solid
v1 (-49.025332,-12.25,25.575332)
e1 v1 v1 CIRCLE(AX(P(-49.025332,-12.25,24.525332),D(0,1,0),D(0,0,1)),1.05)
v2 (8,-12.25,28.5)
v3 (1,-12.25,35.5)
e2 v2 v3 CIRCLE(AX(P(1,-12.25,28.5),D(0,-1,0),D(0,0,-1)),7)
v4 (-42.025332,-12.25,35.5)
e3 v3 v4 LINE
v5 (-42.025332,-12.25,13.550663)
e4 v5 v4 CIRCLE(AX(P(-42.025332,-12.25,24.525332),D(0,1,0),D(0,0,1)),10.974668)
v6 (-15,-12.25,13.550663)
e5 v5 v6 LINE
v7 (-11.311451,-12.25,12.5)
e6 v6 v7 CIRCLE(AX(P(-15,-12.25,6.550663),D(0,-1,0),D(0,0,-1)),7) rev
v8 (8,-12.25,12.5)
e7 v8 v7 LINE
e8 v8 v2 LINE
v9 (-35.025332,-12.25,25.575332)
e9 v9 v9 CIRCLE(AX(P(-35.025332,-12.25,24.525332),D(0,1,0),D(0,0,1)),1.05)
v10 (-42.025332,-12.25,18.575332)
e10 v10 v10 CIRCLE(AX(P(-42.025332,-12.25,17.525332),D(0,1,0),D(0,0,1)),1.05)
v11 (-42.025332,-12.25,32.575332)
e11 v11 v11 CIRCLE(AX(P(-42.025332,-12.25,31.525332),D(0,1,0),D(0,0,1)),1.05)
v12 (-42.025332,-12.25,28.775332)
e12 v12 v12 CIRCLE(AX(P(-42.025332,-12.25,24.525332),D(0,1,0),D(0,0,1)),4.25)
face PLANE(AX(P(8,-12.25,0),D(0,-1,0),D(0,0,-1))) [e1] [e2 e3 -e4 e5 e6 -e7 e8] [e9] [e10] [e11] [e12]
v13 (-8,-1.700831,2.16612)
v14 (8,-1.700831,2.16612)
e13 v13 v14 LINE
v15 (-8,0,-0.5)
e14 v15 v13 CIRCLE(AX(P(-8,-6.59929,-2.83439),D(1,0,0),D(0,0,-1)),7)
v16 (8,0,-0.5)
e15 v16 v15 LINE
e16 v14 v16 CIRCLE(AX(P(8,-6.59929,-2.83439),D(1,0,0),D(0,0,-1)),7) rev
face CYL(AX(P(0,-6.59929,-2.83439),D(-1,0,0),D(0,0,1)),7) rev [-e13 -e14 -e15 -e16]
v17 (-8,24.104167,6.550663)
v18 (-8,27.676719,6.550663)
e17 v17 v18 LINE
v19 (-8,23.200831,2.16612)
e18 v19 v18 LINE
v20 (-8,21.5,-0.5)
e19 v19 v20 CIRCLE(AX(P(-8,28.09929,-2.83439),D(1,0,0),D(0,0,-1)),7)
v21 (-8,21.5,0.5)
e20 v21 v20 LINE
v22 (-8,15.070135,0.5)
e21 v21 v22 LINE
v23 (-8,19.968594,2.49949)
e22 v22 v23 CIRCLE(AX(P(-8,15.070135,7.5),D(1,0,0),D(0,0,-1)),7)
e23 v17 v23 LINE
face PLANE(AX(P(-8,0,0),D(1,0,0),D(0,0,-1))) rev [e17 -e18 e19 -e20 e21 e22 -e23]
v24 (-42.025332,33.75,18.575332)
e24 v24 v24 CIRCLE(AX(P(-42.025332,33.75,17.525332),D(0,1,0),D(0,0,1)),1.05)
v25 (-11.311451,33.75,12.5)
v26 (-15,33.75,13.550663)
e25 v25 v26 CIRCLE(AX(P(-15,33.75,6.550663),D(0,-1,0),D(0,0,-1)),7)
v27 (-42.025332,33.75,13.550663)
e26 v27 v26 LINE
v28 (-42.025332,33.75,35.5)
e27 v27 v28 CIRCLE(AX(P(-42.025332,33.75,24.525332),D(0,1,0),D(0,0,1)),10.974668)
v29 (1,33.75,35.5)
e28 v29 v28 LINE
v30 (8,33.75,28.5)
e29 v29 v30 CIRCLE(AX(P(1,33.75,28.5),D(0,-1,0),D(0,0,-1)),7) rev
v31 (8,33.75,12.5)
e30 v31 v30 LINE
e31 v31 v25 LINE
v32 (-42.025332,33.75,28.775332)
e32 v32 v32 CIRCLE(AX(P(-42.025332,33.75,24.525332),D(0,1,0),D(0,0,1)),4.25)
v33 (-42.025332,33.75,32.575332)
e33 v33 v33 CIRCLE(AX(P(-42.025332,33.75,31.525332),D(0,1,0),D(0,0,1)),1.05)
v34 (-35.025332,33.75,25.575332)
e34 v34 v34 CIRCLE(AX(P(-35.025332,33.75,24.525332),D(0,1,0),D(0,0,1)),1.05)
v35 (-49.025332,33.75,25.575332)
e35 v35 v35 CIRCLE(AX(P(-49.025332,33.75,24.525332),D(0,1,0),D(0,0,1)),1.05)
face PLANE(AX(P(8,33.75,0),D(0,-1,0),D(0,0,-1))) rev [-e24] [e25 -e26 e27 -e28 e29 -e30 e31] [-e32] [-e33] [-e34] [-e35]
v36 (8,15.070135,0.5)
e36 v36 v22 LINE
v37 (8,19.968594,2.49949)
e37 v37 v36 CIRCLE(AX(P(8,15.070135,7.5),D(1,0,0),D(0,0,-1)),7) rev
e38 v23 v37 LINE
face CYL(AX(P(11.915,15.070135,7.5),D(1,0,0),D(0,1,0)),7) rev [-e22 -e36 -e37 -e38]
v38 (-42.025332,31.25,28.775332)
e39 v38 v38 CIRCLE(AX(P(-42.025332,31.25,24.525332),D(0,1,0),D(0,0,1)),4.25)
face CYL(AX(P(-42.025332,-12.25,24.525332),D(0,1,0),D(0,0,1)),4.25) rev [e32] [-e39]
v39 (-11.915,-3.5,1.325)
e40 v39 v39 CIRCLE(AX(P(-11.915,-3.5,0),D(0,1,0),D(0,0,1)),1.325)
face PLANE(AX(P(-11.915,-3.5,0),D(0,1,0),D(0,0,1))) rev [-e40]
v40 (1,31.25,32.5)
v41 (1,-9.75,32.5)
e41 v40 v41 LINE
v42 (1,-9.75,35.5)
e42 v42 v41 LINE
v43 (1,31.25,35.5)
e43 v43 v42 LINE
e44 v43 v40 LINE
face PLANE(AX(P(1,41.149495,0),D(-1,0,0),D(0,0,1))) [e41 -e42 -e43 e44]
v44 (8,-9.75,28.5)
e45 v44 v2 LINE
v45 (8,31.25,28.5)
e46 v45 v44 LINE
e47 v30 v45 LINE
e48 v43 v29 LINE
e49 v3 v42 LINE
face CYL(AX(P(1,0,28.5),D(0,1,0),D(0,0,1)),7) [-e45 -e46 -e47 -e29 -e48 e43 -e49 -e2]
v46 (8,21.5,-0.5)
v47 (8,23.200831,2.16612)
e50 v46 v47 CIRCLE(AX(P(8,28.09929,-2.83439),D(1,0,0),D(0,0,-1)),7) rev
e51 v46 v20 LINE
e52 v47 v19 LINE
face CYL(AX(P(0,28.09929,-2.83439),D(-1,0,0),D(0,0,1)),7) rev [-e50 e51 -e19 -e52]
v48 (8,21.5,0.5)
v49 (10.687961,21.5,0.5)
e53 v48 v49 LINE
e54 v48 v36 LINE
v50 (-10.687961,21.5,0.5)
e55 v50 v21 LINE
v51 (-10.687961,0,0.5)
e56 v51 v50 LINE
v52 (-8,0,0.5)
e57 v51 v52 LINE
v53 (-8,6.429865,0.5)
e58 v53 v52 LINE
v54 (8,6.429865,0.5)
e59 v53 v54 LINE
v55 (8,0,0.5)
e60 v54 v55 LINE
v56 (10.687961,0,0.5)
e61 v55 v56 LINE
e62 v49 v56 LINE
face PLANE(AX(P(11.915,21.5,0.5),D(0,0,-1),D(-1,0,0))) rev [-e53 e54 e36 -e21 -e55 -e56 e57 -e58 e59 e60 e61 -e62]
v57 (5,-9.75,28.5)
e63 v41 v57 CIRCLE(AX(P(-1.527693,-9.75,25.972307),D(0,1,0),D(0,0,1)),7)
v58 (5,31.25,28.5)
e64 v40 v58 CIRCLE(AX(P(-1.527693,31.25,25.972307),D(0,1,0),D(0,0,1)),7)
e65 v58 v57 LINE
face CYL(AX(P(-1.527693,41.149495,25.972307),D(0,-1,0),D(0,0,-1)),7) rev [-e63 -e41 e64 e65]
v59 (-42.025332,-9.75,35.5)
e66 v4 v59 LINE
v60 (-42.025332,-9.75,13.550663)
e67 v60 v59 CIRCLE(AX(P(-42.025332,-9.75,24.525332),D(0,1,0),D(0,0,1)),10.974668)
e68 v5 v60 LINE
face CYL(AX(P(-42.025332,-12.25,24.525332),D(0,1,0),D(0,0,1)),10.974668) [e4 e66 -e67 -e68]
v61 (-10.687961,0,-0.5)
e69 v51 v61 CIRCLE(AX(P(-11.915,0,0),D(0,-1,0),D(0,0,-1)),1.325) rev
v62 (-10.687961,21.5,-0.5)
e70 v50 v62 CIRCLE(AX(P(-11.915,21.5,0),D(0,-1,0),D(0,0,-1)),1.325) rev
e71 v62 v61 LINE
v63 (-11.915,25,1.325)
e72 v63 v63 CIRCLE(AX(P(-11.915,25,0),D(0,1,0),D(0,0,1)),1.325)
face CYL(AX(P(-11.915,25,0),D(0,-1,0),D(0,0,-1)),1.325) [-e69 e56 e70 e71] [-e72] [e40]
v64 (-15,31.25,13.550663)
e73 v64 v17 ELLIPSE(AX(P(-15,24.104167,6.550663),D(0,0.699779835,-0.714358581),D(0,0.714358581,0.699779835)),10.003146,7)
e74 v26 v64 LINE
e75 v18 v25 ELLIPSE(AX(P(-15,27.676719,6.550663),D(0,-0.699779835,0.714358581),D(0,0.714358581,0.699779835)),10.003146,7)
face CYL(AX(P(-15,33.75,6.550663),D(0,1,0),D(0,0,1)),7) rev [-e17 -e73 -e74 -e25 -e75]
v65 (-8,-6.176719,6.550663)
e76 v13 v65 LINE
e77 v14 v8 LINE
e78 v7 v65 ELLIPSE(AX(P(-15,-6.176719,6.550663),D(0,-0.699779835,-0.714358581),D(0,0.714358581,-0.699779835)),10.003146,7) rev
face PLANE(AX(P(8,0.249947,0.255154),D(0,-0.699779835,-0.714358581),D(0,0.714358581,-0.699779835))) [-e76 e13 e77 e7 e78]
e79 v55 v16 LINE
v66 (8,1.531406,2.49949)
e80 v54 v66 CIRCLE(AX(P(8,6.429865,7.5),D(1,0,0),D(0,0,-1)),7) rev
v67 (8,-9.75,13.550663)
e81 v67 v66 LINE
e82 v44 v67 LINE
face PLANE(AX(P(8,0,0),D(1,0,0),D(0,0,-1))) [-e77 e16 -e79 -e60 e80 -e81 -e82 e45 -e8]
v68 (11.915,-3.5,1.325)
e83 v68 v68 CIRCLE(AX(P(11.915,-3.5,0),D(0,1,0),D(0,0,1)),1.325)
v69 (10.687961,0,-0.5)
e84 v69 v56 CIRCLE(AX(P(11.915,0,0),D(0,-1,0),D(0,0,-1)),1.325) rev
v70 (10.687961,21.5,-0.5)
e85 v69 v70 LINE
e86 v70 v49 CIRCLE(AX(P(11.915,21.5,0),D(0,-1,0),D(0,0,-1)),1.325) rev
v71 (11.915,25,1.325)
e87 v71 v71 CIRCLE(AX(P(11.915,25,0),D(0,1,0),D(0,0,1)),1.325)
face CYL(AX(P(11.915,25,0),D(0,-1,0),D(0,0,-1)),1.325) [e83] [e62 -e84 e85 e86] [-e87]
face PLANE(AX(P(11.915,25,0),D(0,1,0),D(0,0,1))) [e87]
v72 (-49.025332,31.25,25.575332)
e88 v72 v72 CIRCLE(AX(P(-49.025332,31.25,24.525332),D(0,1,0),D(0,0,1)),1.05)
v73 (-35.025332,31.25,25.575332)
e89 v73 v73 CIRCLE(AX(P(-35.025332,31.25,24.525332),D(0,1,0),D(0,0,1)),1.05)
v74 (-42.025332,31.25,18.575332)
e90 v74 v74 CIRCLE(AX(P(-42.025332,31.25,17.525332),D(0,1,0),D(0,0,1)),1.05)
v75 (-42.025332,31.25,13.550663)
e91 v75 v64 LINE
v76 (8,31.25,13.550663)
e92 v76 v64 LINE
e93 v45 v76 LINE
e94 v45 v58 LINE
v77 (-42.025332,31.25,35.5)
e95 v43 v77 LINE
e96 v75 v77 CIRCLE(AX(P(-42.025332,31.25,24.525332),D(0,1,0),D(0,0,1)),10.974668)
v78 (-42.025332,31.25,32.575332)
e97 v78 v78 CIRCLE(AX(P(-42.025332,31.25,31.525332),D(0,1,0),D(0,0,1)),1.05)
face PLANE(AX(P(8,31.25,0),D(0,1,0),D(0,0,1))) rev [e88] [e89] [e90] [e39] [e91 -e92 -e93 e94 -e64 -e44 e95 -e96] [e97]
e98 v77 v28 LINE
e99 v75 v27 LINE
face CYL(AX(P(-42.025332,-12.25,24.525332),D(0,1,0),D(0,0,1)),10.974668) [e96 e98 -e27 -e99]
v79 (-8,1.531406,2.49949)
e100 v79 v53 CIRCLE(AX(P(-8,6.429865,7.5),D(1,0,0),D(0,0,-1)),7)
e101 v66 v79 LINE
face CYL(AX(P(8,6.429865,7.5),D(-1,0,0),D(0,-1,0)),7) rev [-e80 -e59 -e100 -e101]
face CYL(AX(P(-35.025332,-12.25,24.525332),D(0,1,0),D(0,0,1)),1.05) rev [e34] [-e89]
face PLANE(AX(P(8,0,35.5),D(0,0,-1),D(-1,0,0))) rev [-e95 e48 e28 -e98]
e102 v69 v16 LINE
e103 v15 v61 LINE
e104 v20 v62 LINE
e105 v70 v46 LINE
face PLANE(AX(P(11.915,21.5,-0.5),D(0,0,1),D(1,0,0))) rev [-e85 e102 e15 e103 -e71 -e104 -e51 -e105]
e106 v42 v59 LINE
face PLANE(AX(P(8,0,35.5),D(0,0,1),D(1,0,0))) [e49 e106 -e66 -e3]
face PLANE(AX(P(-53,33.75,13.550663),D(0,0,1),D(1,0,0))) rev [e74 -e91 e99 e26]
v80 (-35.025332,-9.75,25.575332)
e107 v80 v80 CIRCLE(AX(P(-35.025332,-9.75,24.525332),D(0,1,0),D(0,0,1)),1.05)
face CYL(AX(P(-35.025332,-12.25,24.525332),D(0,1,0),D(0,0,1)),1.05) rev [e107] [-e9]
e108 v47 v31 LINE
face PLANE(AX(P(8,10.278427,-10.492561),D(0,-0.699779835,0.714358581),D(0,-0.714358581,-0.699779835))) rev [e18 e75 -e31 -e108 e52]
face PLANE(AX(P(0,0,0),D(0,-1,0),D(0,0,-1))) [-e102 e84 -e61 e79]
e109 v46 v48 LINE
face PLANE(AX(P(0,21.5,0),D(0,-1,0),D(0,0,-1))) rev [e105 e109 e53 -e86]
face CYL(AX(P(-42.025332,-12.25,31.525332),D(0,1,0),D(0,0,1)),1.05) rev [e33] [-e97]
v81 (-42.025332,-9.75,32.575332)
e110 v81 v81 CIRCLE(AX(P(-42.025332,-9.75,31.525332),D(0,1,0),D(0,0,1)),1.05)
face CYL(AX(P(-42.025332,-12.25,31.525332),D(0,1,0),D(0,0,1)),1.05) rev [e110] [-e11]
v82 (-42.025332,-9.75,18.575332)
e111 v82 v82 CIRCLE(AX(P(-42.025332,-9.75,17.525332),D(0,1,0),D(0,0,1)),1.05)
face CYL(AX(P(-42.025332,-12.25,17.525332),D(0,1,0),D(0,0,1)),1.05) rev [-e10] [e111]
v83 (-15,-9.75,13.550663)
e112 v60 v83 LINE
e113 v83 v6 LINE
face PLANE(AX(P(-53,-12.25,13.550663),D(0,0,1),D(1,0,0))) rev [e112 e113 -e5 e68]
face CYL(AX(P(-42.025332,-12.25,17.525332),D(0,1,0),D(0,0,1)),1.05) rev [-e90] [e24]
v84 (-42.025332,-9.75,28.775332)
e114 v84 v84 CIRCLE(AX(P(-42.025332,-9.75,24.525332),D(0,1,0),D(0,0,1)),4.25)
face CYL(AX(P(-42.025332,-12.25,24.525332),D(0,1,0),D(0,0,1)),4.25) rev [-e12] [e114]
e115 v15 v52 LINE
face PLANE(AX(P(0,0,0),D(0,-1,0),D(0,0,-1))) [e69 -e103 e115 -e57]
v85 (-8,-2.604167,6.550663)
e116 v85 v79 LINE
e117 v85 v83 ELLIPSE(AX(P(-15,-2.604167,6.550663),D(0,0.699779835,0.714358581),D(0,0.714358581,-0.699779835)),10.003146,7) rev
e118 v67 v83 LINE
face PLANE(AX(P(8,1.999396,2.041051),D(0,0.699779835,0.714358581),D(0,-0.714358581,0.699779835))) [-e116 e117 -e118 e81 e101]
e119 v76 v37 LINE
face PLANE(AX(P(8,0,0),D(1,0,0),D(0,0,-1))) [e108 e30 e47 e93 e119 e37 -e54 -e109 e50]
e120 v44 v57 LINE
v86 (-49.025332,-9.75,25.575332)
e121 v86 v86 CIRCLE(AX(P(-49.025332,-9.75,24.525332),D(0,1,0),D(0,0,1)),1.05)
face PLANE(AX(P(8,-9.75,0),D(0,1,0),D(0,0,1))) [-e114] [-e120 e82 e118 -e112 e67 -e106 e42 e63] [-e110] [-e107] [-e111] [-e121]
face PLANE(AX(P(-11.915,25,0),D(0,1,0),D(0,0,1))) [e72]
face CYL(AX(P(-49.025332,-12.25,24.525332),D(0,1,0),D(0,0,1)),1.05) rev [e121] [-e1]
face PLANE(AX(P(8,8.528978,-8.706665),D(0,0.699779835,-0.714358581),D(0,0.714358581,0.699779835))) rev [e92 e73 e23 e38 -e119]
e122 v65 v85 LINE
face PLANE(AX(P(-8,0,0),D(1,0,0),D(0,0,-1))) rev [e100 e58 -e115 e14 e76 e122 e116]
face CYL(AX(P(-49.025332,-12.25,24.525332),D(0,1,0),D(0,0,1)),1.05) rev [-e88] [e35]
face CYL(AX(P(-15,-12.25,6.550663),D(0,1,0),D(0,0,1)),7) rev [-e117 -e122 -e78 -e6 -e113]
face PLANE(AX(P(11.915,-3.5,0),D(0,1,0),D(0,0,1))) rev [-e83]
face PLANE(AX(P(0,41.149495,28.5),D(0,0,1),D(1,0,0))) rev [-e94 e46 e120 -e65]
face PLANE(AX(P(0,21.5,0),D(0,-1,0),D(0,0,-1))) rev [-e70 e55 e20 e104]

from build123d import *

# Parameters (mm, degrees)
SKETCH1_W           = 23.83
SKETCH1_H           = 1
BOSS_EXTRUDE1_DEPTH = 21.5
SKETCH2_R           = 1.325
BOSS_EXTRUDE2_DEPTH = 14.25
BOSS_EXTRUDE4_DEPTH = 8
SKETCH5_W           = 21.949336604
SKETCH5_H           = 2.5
BOSS_EXTRUDE5_DEPTH = 45
SKETCH6_R           = 4.25
SKETCH6_R_2         = 1.05
CUT_EXTRUDE1_DEPTH  = 79.646360374
FILLET1_R           = 7
FILLET2_R           = 7
FILLET3_R           = 7
BOSS_EXTRUDE6_START = 41
BOSS_EXTRUDE6_DEPTH = 41


with BuildPart() as part:
    # Sketch1 → Boss-Extrude1 (new body)
    with BuildSketch(Plane(origin=(0, 0, 0), x_dir=(1, 0, 0), z_dir=(0, 1, 0))):
        Rectangle(SKETCH1_W, SKETCH1_H)
    extrude(amount=BOSS_EXTRUDE1_DEPTH)

    # Sketch2 → Boss-Extrude2 (add, symmetric)
    with BuildSketch(Plane(origin=(0, 10.75, 0), x_dir=(1, 0, 0), z_dir=(0, 1, 0))):
        with Locations(Location((-11.915, 0, 0), (0, 0, 270))):
            Circle(SKETCH2_R)
        with Locations(Location((11.915, 0, 0), (0, 0, 270))):
            Circle(SKETCH2_R)
    extrude(amount=BOSS_EXTRUDE2_DEPTH, both=True)

    # Sketch4 → Boss-Extrude4 (add, symmetric)
    with BuildSketch(Plane(origin=(0, 0, 0), x_dir=(0, 0, -1), z_dir=(1, 0, 0))):
        Polygon((-0.5, 17.927447783), (-0.5, 21.5), (-12.5, 33.75), (-35.5, 33.75), (-35.5, 31.25), (-13.550663396, 31.25), align=None)
        Polygon((-0.5, 0), (-0.5, 3.572552217), (-13.550663396, -9.75), (-35.5, -9.75), (-35.5, -12.25), (-12.5, -12.25), align=None)
    extrude(amount=BOSS_EXTRUDE4_DEPTH, both=True)

    # Sketch5 → Boss-Extrude5 (add)
    with BuildSketch(Plane.ZY.offset(8)):
        with Locations((24.525331698, 32.5)):
            Rectangle(SKETCH5_W, SKETCH5_H)
        with Locations((24.525331698, -11)):
            Rectangle(SKETCH5_W, SKETCH5_H)
    extrude(amount=BOSS_EXTRUDE5_DEPTH)

    # Sketch6 → Cut-Extrude1 (cut, through all)
    with BuildSketch(Plane(origin=(0, 33.75, 0), x_dir=(1, 0, 0), z_dir=(0, 1, 0))):
        with Locations(Location((-42.025331698, -24.525331698, 0), (0, 0, 270))):
            Circle(SKETCH6_R)
        with Locations(Location((-49.025331698, -24.525331698, 0), (0, 0, 270))):
            Circle(SKETCH6_R_2)
        with Locations(Location((-42.025331698, -17.525331698, 0), (0, 0, 270))):
            Circle(SKETCH6_R_2)
        with Locations(Location((-35.025331698, -24.525331698, 0), (0, 0, 270))):
            Circle(SKETCH6_R_2)
        with Locations(Location((-42.025331698, -31.525331698, 0), (0, 0, 270))):
            Circle(SKETCH6_R_2)
        with BuildLine():
            ThreePointArc((-53, -24.525331698), (-49.785594076, -16.76506932), (-42.025331698, -13.550663396))
            Line((-42.025331698, -13.550663396), (-53, -13.550663396))
            Line((-53, -13.550663396), (-53, -24.525331698))
        make_face()
        with BuildLine():
            ThreePointArc((-42.025331698, -35.5), (-49.785594076, -32.285594076), (-53, -24.525331698))
            Line((-53, -24.525331698), (-53, -35.5))
            Line((-53, -35.5), (-42.025331698, -35.5))
        make_face()
    extrude(amount=-CUT_EXTRUDE1_DEPTH, mode=Mode.SUBTRACT)

    # Fillet1
    # the kernel refuses this fillet: 7 mm, written as the material it adds along each edge
    with BuildSketch(Plane(origin=(-8, -12.25, 13.550663396), x_dir=(-1, 0, 0), z_dir=(0, 1, 0))) as fillet1_piece_1_section:
        with BuildLine():
            CenterArc((FILLET1_R, -FILLET1_R), FILLET1_R, 90, 90)
            Line((0, -FILLET1_R), (0, 0))
            Line((0, 0), (FILLET1_R, 0))
        make_face()
    fillet1_piece_1 = extrude(amount=2.5, mode=Mode.PRIVATE)
    fillet1_piece_1 = split(fillet1_piece_1, bisect_by=Plane(origin=(-10.015975833, -11.661011889, 11.923032054), z_dir=(0, 0.699779834816443, 0.7143585813751185)), keep=Keep.TOP, mode=Mode.PRIVATE)
    fillet1_piece_1 = split(fillet1_piece_1, bisect_by=Plane(origin=(-10.015975833, -9.911562302, 13.708928508), z_dir=(0, -0.6997798348164429, -0.7143585813751187)), keep=Keep.TOP, mode=Mode.PRIVATE)
    add(fillet1_piece_1)
    with BuildSketch(Plane(origin=(-8, -12.25, 13.550663396), x_dir=(-1, 0, 0), z_dir=(0, 1, 0))) as fillet1_piece_2_section:
        with BuildLine():
            CenterArc((FILLET1_R, -FILLET1_R), FILLET1_R, 90, 90)
            Line((0, -FILLET1_R), (0, 0))
            Line((0, 0), (FILLET1_R, 0))
        make_face()
    fillet1_piece_2 = extrude(amount=20, mode=Mode.PRIVATE)
    fillet1_piece_2 = split(fillet1_piece_2, bisect_by=Plane(origin=(-8.812454151, -9.294822672, 9.605132414), z_dir=(0, 0.699779834816443, 0.7143585813751185)), keep=Keep.TOP, mode=Mode.PRIVATE)
    fillet1_piece_2 = split(fillet1_piece_2, bisect_by=Plane(origin=(-8.812454151, -9.75, 10.768831879), z_dir=(0, 1, 0)), keep=Keep.TOP, mode=Mode.PRIVATE)
    fillet1_piece_2 = split(fillet1_piece_2, bisect_by=Plane(origin=(-8.812454151, -7.545373085, 11.391028867), z_dir=(0, -0.6997798348164429, -0.7143585813751187)), keep=Keep.TOP, mode=Mode.PRIVATE)
    add(fillet1_piece_2)
    with BuildSketch(Plane(origin=(-8, 33.75, 13.550663396), x_dir=(0, 0, -1), z_dir=(0, -1, 0))) as fillet1_piece_3_section:
        with BuildLine():
            CenterArc((FILLET1_R, -FILLET1_R), FILLET1_R, 90, 90)
            Line((0, -FILLET1_R), (0, 0))
            Line((0, 0), (FILLET1_R, 0))
        make_face()
    fillet1_piece_3 = extrude(amount=2.5, mode=Mode.PRIVATE)
    fillet1_piece_3 = split(fillet1_piece_3, bisect_by=Plane(origin=(-10.015975833, 31.411562301, 13.708928507), z_dir=(0, 0.6997798348164431, -0.7143585813751184)), keep=Keep.TOP, mode=Mode.PRIVATE)
    fillet1_piece_3 = split(fillet1_piece_3, bisect_by=Plane(origin=(-10.015975833, 33.161011889, 11.923032054), z_dir=(0, -0.699779834816443, 0.7143585813751185)), keep=Keep.TOP, mode=Mode.PRIVATE)
    add(fillet1_piece_3)
    with BuildSketch(Plane(origin=(-8, 33.75, 13.550663396), x_dir=(0, 0, -1), z_dir=(0, -1, 0))) as fillet1_piece_4_section:
        with BuildLine():
            CenterArc((FILLET1_R, -FILLET1_R), FILLET1_R, 90, 90)
            Line((0, -FILLET1_R), (0, 0))
            Line((0, 0), (FILLET1_R, 0))
        make_face()
    fillet1_piece_4 = extrude(amount=20, mode=Mode.PRIVATE)
    fillet1_piece_4 = split(fillet1_piece_4, bisect_by=Plane(origin=(-8.812454159, 29.045373088, 11.39102887), z_dir=(0, 0.6997798348164431, -0.7143585813751184)), keep=Keep.TOP, mode=Mode.PRIVATE)
    fillet1_piece_4 = split(fillet1_piece_4, bisect_by=Plane(origin=(-8.812454159, 30.794822675, 9.605132416), z_dir=(0, -0.699779834816443, 0.7143585813751185)), keep=Keep.TOP, mode=Mode.PRIVATE)
    fillet1_piece_4 = split(fillet1_piece_4, bisect_by=Plane(origin=(-8.812454159, 31.25, 10.768831882), z_dir=(0, -1, 0)), keep=Keep.TOP, mode=Mode.PRIVATE)
    add(fillet1_piece_4)
    # the kernel refuses this fillet: 7 mm, written as the material it takes off along each edge
    with BuildSketch(Plane(origin=(8, 7.75, 35.5), x_dir=(0, 0, -1), z_dir=(0, -1, 0))) as fillet1_2_piece_1:
        with BuildLine():
            CenterArc((FILLET1_R, -FILLET1_R), FILLET1_R, 90, 90)
            Line((0, -FILLET1_R), (0, 0))
            Line((0, 0), (FILLET1_R, 0))
        make_face()
    extrude(amount=37.5, mode=Mode.SUBTRACT)
    with BuildSketch(Plane(origin=(8, 51.25, 35.5), x_dir=(-1, 0, 0), z_dir=(0, -1, 0))) as fillet1_2_piece_2:
        with BuildLine():
            CenterArc((FILLET1_R, FILLET1_R), FILLET1_R, 180, 90)
            Line((0, FILLET1_R), (0, 0))
            Line((0, 0), (FILLET1_R, 0))
        make_face()
    extrude(amount=37.5, mode=Mode.SUBTRACT)

    # Fillet2
    fillet2_edges = [part.edges().sort_by_distance(p)[0] for p in [
        (0, 17.927447783, 0.5),
        (0, 3.572552217, 0.5),
    ]]
    fillet(fillet2_edges, radius=FILLET2_R)

    # Fillet3
    # the kernel refuses this fillet: 7 mm, written as the material it adds along each edge
    with BuildSketch(Plane(origin=(-8, 21.5, 0.5), x_dir=(0, 0.7143585813744706, 0.6997798348171044), z_dir=(1, 0, 0))) as fillet3_piece_1:
        with BuildLine():
            CenterArc((2.380920079, -7), FILLET3_R, 90, 26.110260914)
            Line((-0.699779835, -0.714358581), (0, 0))
            Line((0, 0), (2.380920079, 0))
        make_face()
    extrude(amount=16)
    with BuildSketch(Plane(origin=(8, 0, 0.5), x_dir=(0, 0, -1), z_dir=(-1, 0, 0))) as fillet3_piece_2:
        with BuildLine():
            CenterArc((3.33439021, 6.599289533), FILLET3_R, 224.409342785, 26.110260914)
            Line((-1.666119859, 1.70083069), (0, 0))
            Line((0, 0), (1, 0))
        make_face()
    extrude(amount=16)

    # Sketch8 → Boss-Extrude6 (add)
    with BuildSketch(Plane(origin=(0, -9.75, 0), x_dir=(1, 0, 0), z_dir=(0, 1, 0)).offset(BOSS_EXTRUDE6_START)):
        with BuildLine():
            ThreePointArc((1, -35.5), (5.949747468, -33.449747468), (8, -28.5))
            Line((8, -28.5), (5, -28.5))
            ThreePointArc((5, -28.5), (3.422054899, -30.922054899), (1, -32.5))
            Line((1, -32.5), (1, -35.5))
        make_face()
    extrude(amount=-BOSS_EXTRUDE6_DEPTH)


solid = part.part
